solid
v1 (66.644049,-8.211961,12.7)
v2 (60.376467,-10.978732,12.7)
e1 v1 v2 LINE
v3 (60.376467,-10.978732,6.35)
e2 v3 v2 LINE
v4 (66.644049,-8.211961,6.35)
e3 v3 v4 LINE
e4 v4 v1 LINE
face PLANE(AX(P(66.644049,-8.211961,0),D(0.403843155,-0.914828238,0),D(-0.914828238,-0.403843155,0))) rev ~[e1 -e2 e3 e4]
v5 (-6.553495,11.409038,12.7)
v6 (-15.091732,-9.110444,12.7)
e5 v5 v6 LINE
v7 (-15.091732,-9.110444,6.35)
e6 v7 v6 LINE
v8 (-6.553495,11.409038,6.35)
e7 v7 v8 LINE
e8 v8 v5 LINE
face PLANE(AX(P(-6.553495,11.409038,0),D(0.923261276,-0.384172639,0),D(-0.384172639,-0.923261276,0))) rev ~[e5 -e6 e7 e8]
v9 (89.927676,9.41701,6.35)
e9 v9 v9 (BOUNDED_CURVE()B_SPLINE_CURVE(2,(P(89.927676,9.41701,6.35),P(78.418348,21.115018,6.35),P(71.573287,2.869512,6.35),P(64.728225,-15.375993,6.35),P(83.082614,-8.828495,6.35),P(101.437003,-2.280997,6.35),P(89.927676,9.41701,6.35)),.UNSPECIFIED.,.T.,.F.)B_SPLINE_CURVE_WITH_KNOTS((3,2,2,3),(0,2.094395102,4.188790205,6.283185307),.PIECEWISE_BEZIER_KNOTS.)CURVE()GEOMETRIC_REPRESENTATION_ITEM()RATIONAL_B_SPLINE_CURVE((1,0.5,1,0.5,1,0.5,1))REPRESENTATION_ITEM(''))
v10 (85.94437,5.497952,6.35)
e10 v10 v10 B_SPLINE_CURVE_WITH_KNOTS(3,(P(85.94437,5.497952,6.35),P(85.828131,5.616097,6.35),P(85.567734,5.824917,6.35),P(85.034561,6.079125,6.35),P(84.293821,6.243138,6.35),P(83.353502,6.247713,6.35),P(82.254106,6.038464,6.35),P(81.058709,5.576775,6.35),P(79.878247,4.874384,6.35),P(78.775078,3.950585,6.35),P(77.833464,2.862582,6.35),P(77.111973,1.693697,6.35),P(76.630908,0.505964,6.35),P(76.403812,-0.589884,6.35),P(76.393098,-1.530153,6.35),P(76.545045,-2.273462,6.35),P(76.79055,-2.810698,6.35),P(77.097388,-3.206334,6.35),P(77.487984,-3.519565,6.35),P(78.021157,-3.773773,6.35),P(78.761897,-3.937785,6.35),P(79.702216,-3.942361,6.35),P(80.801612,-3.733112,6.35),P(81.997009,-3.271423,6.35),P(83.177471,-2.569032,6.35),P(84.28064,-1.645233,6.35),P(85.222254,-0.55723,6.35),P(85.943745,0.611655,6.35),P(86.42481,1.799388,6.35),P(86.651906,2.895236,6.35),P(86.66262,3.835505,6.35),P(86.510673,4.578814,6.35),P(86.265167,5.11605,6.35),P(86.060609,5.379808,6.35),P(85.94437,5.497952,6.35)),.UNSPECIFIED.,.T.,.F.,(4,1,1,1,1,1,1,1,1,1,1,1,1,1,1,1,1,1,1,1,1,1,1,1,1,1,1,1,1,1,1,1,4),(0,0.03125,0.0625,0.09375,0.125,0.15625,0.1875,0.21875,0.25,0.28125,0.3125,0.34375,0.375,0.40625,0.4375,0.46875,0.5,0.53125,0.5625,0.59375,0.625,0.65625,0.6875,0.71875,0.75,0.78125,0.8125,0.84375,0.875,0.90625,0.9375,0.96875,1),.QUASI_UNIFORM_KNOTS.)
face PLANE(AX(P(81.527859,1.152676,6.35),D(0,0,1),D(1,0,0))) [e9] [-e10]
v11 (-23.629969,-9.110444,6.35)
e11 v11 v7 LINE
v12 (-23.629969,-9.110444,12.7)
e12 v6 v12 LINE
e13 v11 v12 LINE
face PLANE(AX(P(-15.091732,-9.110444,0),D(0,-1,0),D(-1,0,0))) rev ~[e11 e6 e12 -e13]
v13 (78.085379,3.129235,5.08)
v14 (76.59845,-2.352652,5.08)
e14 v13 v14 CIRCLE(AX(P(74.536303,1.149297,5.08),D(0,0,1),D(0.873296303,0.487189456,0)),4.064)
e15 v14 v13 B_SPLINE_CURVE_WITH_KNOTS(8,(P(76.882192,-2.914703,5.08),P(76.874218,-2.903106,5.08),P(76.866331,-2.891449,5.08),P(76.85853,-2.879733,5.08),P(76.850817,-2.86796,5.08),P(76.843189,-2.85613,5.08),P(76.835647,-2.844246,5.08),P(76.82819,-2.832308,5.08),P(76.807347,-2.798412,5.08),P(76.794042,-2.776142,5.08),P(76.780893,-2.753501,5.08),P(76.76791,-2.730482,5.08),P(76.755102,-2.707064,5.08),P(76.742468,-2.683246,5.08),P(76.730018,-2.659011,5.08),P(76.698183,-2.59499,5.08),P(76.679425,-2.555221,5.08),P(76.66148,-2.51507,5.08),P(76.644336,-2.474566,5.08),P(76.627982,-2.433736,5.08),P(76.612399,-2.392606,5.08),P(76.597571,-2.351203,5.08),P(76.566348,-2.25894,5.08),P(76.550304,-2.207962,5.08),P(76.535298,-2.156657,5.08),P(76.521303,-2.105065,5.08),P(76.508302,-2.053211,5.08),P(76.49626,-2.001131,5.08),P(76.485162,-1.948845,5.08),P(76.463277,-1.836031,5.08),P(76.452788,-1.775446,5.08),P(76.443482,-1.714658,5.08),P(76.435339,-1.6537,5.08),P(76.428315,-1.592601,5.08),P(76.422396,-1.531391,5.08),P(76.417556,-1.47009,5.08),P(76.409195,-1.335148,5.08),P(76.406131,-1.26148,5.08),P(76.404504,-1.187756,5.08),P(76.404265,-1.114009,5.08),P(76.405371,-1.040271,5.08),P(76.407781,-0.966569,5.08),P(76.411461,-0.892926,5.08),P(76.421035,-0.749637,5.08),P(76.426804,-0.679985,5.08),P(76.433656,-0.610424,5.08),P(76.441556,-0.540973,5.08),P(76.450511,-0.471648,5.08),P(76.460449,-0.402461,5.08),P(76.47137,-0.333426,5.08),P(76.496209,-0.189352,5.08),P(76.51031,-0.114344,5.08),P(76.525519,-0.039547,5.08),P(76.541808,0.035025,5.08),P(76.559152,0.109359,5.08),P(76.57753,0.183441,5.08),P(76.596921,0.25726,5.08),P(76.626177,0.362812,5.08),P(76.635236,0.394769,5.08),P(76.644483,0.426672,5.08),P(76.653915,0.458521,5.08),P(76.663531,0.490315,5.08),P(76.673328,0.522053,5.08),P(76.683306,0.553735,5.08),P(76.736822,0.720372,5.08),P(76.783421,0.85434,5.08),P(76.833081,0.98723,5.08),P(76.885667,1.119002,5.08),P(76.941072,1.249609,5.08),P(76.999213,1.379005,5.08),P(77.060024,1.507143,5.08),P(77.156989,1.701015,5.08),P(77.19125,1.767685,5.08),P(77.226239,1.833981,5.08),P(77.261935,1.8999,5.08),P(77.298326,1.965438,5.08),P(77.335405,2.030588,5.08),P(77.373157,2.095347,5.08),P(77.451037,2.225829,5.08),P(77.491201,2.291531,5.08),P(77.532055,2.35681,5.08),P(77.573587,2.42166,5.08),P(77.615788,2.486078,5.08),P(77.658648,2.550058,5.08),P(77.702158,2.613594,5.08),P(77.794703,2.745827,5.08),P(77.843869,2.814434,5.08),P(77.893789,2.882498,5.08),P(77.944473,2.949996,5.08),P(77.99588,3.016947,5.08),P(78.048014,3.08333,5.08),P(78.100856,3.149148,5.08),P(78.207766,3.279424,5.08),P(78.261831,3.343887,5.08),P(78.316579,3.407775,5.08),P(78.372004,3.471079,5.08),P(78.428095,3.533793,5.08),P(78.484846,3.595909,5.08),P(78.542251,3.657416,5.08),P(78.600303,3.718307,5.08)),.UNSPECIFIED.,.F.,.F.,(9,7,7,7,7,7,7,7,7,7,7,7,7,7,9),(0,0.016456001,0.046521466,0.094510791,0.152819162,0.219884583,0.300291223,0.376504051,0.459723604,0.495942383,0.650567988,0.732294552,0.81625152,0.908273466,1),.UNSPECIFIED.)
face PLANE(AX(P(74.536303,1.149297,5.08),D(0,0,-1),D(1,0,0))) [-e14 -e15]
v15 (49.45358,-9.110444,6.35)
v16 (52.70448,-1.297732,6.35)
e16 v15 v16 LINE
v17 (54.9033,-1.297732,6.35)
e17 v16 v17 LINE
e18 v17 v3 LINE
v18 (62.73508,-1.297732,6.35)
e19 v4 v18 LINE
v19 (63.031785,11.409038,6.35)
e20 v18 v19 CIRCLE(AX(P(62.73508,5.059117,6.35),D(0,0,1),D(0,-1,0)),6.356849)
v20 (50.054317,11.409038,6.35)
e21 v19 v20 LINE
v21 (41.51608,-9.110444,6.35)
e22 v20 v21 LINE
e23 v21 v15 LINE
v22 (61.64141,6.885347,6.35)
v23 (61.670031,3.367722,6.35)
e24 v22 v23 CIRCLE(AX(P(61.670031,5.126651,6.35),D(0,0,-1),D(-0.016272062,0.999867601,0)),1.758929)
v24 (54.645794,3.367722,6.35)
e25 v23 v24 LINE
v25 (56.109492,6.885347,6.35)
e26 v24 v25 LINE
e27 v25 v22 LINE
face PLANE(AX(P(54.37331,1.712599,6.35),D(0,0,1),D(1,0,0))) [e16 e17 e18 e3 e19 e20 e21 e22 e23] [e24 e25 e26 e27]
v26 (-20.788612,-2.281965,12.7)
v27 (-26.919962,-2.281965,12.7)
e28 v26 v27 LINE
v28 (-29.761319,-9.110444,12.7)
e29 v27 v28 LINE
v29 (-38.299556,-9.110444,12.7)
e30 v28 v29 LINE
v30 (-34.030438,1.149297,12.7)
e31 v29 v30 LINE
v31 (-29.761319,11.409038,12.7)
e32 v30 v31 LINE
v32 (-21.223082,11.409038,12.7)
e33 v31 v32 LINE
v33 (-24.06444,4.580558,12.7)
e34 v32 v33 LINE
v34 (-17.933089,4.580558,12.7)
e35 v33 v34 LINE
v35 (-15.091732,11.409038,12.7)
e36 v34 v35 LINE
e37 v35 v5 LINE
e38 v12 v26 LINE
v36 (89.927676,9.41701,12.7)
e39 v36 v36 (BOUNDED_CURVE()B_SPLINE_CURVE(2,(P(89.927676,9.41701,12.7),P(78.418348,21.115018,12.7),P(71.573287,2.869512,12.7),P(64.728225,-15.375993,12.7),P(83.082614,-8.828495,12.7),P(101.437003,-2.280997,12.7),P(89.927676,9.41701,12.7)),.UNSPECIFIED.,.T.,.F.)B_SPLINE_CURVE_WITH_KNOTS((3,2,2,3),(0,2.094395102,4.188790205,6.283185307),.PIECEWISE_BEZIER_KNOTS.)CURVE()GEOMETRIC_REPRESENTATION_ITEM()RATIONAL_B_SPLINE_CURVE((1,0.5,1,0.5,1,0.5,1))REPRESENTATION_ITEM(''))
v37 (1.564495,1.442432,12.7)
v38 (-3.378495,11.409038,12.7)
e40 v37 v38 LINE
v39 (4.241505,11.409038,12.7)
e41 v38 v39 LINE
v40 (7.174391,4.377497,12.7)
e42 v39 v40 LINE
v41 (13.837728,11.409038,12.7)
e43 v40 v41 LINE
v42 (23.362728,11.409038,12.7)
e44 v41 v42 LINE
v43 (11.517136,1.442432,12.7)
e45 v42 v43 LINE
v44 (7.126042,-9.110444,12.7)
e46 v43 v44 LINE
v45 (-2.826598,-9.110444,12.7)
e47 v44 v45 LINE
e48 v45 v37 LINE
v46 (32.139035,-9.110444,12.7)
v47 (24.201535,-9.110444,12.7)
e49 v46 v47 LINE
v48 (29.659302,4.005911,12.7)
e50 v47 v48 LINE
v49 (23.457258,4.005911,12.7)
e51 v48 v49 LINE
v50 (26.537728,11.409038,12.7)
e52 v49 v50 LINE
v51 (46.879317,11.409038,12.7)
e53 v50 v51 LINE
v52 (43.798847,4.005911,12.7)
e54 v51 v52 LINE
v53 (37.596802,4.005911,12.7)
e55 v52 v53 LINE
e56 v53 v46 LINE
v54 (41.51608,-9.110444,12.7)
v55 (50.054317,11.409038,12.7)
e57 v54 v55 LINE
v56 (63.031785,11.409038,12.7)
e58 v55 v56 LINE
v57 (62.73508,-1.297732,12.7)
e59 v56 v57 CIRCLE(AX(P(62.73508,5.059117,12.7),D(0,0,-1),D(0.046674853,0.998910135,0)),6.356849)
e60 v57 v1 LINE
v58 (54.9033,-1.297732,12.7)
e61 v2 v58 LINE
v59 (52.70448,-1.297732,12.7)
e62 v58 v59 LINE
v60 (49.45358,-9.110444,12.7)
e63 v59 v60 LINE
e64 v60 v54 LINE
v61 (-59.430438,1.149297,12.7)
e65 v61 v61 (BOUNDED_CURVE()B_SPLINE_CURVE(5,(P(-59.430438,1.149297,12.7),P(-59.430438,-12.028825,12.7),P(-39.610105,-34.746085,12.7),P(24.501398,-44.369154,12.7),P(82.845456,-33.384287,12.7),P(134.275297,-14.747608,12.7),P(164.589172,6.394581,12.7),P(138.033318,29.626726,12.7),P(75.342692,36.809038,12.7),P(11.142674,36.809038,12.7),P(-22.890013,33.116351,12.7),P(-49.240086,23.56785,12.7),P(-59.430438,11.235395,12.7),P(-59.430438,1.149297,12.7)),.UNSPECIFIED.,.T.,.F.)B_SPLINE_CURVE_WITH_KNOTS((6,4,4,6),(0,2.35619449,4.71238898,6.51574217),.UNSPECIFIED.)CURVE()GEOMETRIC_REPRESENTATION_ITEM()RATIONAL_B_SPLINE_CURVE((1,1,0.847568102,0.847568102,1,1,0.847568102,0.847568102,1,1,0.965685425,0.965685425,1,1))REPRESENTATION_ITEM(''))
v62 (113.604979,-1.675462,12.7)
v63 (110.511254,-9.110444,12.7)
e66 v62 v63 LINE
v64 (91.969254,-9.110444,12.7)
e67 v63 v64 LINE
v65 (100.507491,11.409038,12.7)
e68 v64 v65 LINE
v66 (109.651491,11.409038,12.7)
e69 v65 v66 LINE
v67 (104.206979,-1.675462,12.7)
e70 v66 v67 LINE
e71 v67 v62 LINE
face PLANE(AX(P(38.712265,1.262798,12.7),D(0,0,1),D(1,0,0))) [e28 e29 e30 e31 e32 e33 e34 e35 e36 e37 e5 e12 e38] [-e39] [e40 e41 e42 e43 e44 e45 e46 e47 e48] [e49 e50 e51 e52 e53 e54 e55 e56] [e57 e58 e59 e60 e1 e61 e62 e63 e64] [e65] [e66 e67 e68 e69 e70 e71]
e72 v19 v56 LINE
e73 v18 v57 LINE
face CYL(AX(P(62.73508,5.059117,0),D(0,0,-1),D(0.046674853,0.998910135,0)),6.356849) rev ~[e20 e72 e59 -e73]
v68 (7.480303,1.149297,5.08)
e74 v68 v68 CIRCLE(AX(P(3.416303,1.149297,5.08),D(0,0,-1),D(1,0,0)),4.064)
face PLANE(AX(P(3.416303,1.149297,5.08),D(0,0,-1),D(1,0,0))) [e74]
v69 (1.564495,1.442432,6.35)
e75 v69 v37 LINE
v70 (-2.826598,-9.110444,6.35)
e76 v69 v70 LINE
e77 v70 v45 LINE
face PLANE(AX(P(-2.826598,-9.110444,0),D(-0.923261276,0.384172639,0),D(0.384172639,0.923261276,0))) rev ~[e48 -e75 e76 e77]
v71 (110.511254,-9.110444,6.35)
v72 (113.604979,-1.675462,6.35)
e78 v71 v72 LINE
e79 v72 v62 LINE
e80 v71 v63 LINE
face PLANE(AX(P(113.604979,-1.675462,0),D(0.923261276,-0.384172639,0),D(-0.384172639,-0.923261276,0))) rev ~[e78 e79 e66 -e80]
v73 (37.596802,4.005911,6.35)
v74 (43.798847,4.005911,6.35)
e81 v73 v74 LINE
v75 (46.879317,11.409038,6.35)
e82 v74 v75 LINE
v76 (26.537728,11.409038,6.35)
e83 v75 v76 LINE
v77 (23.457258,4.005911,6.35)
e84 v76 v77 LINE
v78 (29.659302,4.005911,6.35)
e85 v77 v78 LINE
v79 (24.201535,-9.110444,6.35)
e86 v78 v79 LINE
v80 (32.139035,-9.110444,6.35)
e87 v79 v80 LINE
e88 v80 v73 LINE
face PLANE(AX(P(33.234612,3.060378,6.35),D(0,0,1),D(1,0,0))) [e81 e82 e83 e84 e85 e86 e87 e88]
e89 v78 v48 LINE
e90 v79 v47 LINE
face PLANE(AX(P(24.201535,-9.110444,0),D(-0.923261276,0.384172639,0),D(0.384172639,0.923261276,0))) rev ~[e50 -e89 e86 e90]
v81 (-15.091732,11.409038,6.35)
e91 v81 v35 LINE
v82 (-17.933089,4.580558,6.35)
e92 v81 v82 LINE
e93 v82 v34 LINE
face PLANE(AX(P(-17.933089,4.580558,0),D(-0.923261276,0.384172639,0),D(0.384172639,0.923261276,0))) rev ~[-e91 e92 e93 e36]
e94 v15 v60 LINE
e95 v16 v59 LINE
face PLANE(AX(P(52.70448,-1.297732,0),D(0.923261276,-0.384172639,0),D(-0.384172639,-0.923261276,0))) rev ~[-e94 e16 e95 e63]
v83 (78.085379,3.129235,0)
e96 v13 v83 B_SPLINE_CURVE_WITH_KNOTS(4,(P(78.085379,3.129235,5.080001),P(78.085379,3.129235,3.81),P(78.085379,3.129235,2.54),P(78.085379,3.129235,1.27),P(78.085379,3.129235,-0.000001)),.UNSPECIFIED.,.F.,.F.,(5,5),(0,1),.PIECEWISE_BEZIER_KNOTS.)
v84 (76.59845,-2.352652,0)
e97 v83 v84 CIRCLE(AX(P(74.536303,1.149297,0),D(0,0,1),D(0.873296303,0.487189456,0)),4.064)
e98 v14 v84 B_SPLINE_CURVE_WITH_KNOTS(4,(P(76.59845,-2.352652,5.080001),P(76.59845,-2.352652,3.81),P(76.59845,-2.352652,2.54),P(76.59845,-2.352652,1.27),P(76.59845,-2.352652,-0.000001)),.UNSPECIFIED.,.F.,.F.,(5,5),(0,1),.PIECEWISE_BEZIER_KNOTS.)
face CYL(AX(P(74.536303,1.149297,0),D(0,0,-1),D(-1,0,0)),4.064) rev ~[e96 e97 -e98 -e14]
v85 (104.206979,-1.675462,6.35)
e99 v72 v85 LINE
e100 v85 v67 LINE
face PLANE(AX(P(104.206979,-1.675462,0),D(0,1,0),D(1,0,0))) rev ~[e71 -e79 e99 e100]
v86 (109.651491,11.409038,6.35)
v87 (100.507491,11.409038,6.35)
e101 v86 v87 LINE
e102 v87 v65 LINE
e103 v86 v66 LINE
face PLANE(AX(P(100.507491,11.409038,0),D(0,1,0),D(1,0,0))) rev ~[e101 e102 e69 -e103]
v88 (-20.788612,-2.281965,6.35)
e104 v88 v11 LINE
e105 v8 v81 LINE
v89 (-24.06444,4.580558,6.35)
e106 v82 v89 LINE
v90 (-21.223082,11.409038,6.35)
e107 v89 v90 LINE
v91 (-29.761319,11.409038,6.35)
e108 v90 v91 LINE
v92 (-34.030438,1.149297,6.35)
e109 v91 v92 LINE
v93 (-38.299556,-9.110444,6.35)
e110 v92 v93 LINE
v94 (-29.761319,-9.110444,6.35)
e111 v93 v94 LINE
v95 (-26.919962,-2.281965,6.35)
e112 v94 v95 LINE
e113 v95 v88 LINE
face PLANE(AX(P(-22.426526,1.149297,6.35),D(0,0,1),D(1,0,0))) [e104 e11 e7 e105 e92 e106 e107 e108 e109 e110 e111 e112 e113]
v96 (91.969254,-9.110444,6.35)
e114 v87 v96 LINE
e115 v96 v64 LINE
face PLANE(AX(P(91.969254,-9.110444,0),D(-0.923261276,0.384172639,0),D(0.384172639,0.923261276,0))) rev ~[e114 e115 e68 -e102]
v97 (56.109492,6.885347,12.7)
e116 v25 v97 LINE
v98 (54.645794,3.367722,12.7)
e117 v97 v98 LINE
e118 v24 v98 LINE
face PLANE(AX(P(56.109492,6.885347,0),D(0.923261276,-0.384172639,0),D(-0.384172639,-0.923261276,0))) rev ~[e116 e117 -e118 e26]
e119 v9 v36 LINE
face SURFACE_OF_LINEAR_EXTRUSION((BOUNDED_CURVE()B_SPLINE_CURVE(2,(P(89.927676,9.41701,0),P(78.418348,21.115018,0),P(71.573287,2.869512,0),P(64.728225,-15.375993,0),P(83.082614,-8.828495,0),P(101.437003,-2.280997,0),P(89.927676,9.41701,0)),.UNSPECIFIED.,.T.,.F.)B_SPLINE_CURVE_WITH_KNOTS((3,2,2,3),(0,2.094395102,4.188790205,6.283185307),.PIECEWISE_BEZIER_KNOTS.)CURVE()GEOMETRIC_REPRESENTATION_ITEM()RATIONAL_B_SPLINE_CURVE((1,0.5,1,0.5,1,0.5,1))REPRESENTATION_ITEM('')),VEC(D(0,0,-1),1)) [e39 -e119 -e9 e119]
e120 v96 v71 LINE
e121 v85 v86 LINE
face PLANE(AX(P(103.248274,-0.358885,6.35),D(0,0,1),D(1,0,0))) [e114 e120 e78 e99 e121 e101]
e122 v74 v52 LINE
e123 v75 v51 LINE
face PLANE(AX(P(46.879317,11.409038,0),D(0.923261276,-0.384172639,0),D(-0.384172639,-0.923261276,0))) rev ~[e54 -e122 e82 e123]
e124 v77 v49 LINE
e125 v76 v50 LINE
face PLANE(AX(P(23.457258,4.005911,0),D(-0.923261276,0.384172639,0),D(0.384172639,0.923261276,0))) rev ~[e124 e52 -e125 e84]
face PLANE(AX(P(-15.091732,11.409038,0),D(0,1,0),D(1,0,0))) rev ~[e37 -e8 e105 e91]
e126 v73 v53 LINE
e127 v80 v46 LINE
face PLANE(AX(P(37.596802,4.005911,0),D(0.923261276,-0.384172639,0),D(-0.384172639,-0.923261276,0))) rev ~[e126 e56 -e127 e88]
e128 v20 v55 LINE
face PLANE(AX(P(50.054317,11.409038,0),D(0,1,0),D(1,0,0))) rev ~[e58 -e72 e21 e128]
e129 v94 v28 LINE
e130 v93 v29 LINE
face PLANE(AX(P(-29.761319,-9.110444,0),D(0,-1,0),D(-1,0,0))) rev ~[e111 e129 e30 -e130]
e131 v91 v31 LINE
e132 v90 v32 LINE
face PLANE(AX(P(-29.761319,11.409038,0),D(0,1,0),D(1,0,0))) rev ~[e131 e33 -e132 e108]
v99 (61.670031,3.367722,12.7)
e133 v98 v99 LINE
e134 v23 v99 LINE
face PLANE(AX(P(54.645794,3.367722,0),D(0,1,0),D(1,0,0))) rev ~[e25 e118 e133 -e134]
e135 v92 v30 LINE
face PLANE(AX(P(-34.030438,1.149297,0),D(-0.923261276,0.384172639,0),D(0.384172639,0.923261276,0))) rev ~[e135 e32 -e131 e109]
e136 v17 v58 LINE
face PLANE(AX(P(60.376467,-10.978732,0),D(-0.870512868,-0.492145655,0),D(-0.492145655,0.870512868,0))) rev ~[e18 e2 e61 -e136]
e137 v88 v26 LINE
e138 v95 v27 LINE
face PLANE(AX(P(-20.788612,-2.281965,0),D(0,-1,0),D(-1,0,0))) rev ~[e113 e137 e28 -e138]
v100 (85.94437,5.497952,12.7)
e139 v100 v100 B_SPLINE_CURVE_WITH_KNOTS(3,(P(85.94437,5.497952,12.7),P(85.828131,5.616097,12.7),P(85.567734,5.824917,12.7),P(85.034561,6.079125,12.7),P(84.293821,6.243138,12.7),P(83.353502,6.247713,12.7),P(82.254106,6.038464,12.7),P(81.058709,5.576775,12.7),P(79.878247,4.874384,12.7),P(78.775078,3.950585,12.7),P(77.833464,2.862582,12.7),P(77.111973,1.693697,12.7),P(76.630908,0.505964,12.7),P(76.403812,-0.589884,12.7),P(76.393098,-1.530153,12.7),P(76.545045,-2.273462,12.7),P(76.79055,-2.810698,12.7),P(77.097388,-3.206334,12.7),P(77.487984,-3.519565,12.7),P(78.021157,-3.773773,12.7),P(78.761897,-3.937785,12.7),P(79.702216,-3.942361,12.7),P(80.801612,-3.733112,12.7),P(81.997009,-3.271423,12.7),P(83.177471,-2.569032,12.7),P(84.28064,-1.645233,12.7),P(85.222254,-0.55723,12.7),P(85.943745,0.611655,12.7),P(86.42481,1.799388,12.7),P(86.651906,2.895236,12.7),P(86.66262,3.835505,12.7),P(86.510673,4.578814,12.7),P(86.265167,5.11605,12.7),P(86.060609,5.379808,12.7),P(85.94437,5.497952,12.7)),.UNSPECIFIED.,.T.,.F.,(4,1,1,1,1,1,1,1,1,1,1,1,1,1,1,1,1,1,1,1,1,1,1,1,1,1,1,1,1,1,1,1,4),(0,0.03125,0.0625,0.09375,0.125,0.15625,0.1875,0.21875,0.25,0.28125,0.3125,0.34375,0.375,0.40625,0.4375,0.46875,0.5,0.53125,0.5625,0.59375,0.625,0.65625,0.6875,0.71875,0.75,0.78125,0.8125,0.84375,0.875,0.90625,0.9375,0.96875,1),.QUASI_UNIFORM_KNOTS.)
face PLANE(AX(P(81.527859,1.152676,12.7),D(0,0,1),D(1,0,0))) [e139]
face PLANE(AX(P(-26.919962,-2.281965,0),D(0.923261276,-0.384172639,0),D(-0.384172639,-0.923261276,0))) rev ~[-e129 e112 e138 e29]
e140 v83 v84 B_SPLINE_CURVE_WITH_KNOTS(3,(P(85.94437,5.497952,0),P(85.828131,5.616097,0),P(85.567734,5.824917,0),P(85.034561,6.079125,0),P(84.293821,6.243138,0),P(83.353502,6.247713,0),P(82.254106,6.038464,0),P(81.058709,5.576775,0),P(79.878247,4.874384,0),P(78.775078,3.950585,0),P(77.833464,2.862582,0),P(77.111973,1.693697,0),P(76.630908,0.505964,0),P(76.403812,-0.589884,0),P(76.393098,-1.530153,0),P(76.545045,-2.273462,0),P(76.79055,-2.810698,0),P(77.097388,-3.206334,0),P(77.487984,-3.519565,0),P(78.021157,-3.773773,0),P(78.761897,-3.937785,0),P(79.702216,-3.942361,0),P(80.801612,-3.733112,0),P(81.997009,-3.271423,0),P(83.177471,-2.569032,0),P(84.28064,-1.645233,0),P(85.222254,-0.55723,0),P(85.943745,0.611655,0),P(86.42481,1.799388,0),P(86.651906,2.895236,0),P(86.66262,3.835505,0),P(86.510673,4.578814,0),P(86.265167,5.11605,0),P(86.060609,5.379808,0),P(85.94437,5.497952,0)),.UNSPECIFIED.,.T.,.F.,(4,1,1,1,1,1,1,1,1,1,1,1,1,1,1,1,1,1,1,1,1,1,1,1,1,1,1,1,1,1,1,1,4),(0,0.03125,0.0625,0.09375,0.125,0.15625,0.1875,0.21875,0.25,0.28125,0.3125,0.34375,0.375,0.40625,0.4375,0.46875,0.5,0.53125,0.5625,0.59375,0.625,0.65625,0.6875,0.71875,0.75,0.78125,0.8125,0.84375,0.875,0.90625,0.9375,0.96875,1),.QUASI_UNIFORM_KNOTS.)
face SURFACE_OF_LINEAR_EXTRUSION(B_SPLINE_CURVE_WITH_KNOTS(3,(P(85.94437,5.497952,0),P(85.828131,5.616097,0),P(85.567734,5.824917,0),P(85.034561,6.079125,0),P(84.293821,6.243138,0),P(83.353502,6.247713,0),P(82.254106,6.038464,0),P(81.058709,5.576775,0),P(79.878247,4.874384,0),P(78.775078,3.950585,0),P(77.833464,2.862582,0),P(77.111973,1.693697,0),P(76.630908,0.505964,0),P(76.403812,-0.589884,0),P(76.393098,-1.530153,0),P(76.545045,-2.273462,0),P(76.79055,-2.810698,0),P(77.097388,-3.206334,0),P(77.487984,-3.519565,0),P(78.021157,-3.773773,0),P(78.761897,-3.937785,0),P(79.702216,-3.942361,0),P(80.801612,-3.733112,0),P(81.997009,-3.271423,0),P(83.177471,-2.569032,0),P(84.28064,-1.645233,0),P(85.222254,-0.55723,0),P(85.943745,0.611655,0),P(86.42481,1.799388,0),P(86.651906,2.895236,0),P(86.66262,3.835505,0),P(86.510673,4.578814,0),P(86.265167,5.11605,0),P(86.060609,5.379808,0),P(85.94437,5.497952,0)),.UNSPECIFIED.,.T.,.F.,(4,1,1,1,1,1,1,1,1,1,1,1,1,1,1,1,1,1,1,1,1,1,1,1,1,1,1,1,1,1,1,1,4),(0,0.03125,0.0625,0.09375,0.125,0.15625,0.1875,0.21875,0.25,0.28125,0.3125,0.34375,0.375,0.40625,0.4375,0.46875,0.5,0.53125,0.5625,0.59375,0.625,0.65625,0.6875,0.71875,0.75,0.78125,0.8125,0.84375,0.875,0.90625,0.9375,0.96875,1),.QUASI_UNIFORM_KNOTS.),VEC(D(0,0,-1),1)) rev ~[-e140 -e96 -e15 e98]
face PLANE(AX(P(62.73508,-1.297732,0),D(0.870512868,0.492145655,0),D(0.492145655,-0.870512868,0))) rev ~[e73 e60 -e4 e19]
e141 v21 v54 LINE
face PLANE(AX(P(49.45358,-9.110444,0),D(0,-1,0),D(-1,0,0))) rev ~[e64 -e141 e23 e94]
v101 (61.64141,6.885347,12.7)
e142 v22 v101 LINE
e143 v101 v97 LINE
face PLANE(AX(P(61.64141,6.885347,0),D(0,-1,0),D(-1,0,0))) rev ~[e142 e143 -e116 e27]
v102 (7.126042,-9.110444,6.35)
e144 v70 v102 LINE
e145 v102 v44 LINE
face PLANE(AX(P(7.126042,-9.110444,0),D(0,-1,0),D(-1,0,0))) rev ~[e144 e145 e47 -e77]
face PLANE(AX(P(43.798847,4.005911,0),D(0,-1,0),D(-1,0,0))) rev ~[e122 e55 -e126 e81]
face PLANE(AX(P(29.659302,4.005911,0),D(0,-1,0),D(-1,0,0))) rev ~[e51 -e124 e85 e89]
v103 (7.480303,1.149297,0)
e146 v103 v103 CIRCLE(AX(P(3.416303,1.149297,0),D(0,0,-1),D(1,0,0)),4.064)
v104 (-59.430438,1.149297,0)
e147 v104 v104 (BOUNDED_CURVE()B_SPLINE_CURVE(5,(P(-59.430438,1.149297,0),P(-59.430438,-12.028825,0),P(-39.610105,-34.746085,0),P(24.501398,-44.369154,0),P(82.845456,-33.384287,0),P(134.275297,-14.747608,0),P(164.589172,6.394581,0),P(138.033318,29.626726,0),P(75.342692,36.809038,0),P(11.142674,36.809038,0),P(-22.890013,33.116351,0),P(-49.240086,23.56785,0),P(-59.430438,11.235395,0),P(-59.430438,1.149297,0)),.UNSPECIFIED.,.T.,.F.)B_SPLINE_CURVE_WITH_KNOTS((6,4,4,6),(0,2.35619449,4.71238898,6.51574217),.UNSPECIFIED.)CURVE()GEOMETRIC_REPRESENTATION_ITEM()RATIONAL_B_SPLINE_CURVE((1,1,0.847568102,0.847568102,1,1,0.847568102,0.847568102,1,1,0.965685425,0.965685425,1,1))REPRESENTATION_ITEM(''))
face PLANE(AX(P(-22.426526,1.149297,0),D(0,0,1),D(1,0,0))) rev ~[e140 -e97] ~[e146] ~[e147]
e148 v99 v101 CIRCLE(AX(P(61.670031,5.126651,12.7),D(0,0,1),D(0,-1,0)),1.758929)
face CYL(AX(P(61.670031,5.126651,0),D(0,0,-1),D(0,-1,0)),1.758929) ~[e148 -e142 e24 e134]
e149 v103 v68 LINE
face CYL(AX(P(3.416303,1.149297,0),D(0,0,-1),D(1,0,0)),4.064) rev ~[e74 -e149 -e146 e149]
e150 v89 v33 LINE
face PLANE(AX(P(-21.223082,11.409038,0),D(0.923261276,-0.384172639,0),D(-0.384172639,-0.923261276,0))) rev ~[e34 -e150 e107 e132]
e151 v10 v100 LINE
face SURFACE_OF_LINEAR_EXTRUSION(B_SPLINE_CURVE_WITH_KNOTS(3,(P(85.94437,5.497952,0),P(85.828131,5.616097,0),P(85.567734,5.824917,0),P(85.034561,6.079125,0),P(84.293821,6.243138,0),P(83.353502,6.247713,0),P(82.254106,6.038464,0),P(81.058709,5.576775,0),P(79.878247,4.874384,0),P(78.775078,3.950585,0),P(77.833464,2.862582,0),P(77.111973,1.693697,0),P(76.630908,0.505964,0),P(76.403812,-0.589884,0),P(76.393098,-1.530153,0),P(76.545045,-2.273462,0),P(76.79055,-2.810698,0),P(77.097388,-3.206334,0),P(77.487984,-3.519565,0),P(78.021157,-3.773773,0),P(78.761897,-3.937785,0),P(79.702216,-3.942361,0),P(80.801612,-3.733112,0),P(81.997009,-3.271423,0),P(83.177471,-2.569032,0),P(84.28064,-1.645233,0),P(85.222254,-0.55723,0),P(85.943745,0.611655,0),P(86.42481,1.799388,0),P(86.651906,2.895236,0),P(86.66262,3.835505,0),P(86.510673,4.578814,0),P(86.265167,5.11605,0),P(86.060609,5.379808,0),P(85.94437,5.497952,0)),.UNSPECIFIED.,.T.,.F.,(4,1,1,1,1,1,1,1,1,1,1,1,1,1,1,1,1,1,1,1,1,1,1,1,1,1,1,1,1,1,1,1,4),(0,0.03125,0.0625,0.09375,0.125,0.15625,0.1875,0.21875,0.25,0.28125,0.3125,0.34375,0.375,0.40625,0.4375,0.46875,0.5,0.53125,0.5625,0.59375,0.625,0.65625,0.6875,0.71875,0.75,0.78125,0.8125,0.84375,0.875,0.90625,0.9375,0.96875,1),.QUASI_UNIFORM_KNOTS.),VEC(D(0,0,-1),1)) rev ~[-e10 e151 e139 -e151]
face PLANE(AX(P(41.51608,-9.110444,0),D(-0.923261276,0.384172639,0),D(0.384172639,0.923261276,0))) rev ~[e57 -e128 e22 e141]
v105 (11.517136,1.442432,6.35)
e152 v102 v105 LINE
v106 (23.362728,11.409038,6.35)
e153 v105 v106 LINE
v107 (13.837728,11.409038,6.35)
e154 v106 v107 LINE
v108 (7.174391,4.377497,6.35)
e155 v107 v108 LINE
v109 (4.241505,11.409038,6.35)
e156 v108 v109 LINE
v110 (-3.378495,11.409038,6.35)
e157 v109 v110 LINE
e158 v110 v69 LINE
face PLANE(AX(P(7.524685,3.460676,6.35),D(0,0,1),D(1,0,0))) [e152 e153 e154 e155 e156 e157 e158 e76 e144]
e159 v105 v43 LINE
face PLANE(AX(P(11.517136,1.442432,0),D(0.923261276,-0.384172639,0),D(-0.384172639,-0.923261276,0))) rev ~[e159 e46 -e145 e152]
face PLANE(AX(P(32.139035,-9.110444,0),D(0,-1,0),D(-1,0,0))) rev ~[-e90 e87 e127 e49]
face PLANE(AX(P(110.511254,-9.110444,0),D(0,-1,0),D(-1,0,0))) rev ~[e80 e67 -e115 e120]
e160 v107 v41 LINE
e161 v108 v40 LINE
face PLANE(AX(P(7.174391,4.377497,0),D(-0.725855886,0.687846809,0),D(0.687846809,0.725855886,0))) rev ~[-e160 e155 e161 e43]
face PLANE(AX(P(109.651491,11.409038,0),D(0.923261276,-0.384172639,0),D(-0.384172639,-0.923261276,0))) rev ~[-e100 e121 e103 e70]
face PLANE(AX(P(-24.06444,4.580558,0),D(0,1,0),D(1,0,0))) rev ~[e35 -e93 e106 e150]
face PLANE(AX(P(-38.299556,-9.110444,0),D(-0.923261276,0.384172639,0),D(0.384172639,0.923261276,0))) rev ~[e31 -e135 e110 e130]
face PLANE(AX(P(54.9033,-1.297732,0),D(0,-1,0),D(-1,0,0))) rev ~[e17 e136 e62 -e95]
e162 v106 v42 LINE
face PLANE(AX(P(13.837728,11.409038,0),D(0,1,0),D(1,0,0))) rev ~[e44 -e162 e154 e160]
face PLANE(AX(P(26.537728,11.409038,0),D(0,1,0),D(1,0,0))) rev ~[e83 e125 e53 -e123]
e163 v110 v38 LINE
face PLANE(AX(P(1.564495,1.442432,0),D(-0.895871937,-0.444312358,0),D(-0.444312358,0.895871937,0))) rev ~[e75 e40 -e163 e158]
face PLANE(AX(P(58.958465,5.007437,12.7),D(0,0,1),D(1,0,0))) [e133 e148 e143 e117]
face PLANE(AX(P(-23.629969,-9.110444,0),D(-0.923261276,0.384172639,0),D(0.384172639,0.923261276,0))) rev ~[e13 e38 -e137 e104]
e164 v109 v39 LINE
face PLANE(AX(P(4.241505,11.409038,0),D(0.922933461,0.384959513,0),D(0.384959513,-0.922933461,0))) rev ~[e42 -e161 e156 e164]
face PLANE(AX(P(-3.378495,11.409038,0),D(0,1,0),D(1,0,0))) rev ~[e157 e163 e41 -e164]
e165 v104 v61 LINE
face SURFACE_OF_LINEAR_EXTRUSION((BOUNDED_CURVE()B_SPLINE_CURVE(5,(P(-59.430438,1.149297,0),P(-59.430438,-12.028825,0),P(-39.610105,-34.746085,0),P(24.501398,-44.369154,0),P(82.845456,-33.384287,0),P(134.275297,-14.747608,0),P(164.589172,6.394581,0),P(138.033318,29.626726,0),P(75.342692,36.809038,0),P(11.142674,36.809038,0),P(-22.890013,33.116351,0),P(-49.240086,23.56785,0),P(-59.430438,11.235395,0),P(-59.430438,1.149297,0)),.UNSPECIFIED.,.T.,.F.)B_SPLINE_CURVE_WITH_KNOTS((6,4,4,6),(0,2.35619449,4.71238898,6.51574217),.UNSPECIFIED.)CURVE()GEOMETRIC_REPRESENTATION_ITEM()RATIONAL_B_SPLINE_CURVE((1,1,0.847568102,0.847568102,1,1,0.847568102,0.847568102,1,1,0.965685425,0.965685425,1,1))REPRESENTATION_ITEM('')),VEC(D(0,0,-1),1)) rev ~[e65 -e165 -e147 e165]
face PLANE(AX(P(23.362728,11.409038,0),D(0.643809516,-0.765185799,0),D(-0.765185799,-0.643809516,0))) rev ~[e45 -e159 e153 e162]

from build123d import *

# Parameters (mm, degrees)
F1_DEPTH = 12.7
F2_DEPTH = 6.35
F3_R     = 4.064
F4_DEPTH = 5.08
F5_DEPTH = 12.7


# Not quite as in the source:
# - the dataset's text gives a spline's control points without its knots; the knots are read off the source's solid
# - a feature names something its author has since deleted; it is built from what else it names


with BuildPart() as f1:
    # F0 (on Top) → F1 (new body)
    with BuildSketch(Plane.XY):
        with BuildLine():
            add(Edge.make_bspline(
                [(38.9763030052, 36.8090377465), (-59.430437785, 36.8090377465), (-59.430437785, 1.1492968171)],
                knots=[4.7123889804, 4.7123889804, 4.7123889804, 6.2831853072, 6.2831853072, 6.2831853072], degree=2, weights=[1, 0.7071067812, 1]))
            add(Edge.make_bspline(
                [(-59.430437785, 1.1492968171), (-59.430437785, -84.9409333653), (108.5603767324, -24.0659478094), (276.5511912498, 36.8090377465), (38.9763030052, 36.8090377465)],
                knots=[0, 0, 0, 2.3561944902, 2.3561944902, 4.7123889804, 4.7123889804, 4.7123889804], degree=2, weights=[1, 0.3826834324, 1, 0.3826834324, 1]))
        make_face()
        with BuildLine():
            Line((41.5160800878, -9.1104441122), (50.0543169812, 11.4090377465))
            Line((50.0543169812, 11.4090377465), (63.0317851901, 11.4090377465))
            ThreePointArc((63.0317851901, 11.4090377465), (69.090196833, 4.9107240283), (62.7350802025, -1.2977319333))
            Line((62.7350802025, -1.2977319333), (66.6440492651, -8.2119611582))
            Line((66.6440492651, -8.2119611582), (60.376466607, -10.9787322865))
            Line((60.376466607, -10.9787322865), (54.9032996575, -1.2977319333))
            Line((54.9032996575, -1.2977319333), (52.7044802725, -1.2977319333))
            Line((52.7044802725, -1.2977319333), (49.4535800878, -9.1104441122))
            Line((49.4535800878, -9.1104441122), (41.5160800878, -9.1104441122))
        make_face(mode=Mode.SUBTRACT)
        Polygon((-29.7613193382, -9.1104441122), (-38.2995562317, -9.1104441122), (-34.030437785, 1.1492968171), (-29.7613193382, 11.4090377465), (-21.2230824447, 11.4090377465), (-24.0644395016, 4.5805583649), (-17.9330891249, 4.5805583649), (-15.0917320681, 11.4090377465), (-6.5534951746, 11.4090377465), (-15.0917320681, -9.1104441122), (-23.6299689616, -9.1104441122), (-20.7886119047, -2.2819647307), (-26.9199622814, -2.2819647307), align=None, mode=Mode.SUBTRACT)
        Polygon((7.1260423387, -9.1104441122), (-2.8265984822, -9.1104441122), (1.5644947773, 1.4424322722), (-3.3784951746, 11.4090377465), (4.2415048254, 11.4090377465), (7.1743905157, 4.3774974254), (13.8377277804, 11.4090377465), (23.3627277804, 11.4090377465), (11.5171355982, 1.4424322722), align=None, mode=Mode.SUBTRACT)
        Polygon((26.5377277804, 11.4090377465), (38.9763030052, 11.4090377465), (46.8793169812, 11.4090377465), (43.7988467258, 4.0059105773), (37.5968021254, 4.0059105773), (32.1390354874, -9.1104441122), (24.2015354874, -9.1104441122), (29.6593021254, 4.0059105773), (23.457257525, 4.0059105773), align=None, mode=Mode.SUBTRACT)
        with BuildLine():
            add(Edge.make_bspline(
                [(89.9276758544, 9.4170104569), (78.4183483926, 21.1150176431), (71.5732868008, 2.8695124614), (64.7282252089, -15.3759927203), (83.0826142625, -8.8284947248), (101.4370033161, -2.2809967293), (89.9276758544, 9.4170104569)],
                knots=[0, 0, 0, 2.0943951024, 2.0943951024, 4.1887902048, 4.1887902048, 6.2831853072, 6.2831853072, 6.2831853072], degree=2, weights=[1, 0.5, 1, 0.5, 1, 0.5, 1]))
        make_face(mode=Mode.SUBTRACT)
        Polygon((91.9692541833, -9.1104441122), (100.5074910767, 11.4090377465), (109.6514910767, 11.4090377465), (104.2069794715, -1.6754618412), (113.6049794715, -1.6754618412), (110.5112541833, -9.1104441122), align=None, mode=Mode.SUBTRACT)
    extrude(amount=F1_DEPTH)

    # F0 (on Top) → F2 (join)
    with BuildSketch(Plane.XY):
        Polygon((-34.030437785, 1.1492968171), (-38.2995562317, -9.1104441122), (-29.7613193382, -9.1104441122), (-26.9199622814, -2.2819647307), (-20.7886119047, -2.2819647307), (-23.6299689616, -9.1104441122), (-15.0917320681, -9.1104441122), (-6.5534951746, 11.4090377465), (-15.0917320681, 11.4090377465), (-17.9330891249, 4.5805583649), (-24.0644395016, 4.5805583649), (-21.2230824447, 11.4090377465), (-29.7613193382, 11.4090377465), align=None)
        Polygon((1.5644947773, 1.4424322722), (-2.8265984822, -9.1104441122), (7.1260423387, -9.1104441122), (11.5171355982, 1.4424322722), (23.3627277804, 11.4090377465), (13.8377277804, 11.4090377465), (7.1743905157, 4.3774974254), (4.2415048254, 11.4090377465), (-3.3784951746, 11.4090377465), align=None)
        Polygon((46.8793169812, 11.4090377465), (38.9763030052, 11.4090377465), (26.5377277804, 11.4090377465), (23.457257525, 4.0059105773), (29.6593021254, 4.0059105773), (24.2015354874, -9.1104441122), (32.1390354874, -9.1104441122), (37.5968021254, 4.0059105773), (43.7988467258, 4.0059105773), align=None)
        with BuildLine():
            Line((63.0317851901, 11.4090377465), (50.0543169812, 11.4090377465))
            Line((50.0543169812, 11.4090377465), (41.5160800878, -9.1104441122))
            Line((41.5160800878, -9.1104441122), (49.4535800878, -9.1104441122))
            Line((49.4535800878, -9.1104441122), (52.7044802725, -1.2977319333))
            Line((52.7044802725, -1.2977319333), (54.9032996575, -1.2977319333))
            Line((54.9032996575, -1.2977319333), (62.7350802025, -1.2977319333))
            ThreePointArc((62.7350802025, -1.2977319333), (69.090196833, 4.9107240283), (63.0317851901, 11.4090377465))
        make_face()
        with BuildLine():
            Line((54.6457937759, 3.3677215688), (56.1094915291, 6.8853470303))
            Line((56.1094915291, 6.8853470303), (61.6414099932, 6.8853470303))
            ThreePointArc((61.6414099932, 6.8853470303), (63.4289023483, 5.140961916), (61.6700313985, 3.3677215688))
            Line((61.6700313985, 3.3677215688), (54.6457937759, 3.3677215688))
        make_face(mode=Mode.SUBTRACT)
        Polygon((66.6440492651, -8.2119611582), (62.7350802025, -1.2977319333), (54.9032996575, -1.2977319333), (60.376466607, -10.9787322865), align=None)
        Polygon((109.6514910767, 11.4090377465), (100.5074910767, 11.4090377465), (91.9692541833, -9.1104441122), (110.5112541833, -9.1104441122), (113.6049794715, -1.6754618412), (104.2069794715, -1.6754618412), align=None)
        with BuildLine():
            add(Edge.make_bspline(
                [(89.9276758544, 9.4170104569), (78.4183483926, 21.1150176431), (71.5732868008, 2.8695124614), (64.7282252089, -15.3759927203), (83.0826142625, -8.8284947248), (101.4370033161, -2.2809967293), (89.9276758544, 9.4170104569)],
                knots=[0, 0, 0, 2.0943951024, 2.0943951024, 4.1887902048, 4.1887902048, 6.2831853072, 6.2831853072, 6.2831853072], degree=2, weights=[1, 0.5, 1, 0.5, 1, 0.5, 1]))
        make_face()
        with BuildLine():
            add(Edge.make_bspline(
                [(85.9443699375, 5.4979521551), (85.8281310105, 5.6160966608), (85.567733934, 5.8249167649), (85.0345610289, 6.0791249218), (84.2938208293, 6.2431375515), (83.3535018874, 6.2477134028), (82.2541063192, 6.0384641997), (81.0587088146, 5.576775297), (79.8782469474, 4.8743843262), (78.7750781655, 3.9505849579), (77.8334641871, 2.8625823157), (77.1119726081, 1.6936968647), (76.630908436, 0.505964109), (76.4038115156, -0.5898838883), (76.3930978548, -1.5301529287), (76.5450449027, -2.2734619362), (76.7905504491, -2.8106976019), (77.0973883963, -3.2063344797), (77.4879840111, -3.5195646359), (78.0211569162, -3.7737727927), (78.7618971158, -3.9377854224), (79.7022160577, -3.9423612737), (80.8016116259, -3.7331120707), (81.9970091305, -3.271423168), (83.1774709977, -2.5690321972), (84.2806397796, -1.6452328289), (85.222253758, -0.5572301866), (85.943745337, 0.6116552643), (86.4248095091, 1.7993880201), (86.6519064295, 2.8952360173), (86.6626200903, 3.8355050577), (86.5106730424, 4.5788140653), (86.265167496, 5.1160497309), (86.0606088645, 5.3798076495), (85.9443699375, 5.4979521551)],
                knots=[0, 0, 0, 0, 0.03125, 0.0625, 0.09375, 0.125, 0.15625, 0.1875, 0.21875, 0.25, 0.28125, 0.3125, 0.34375, 0.375, 0.40625, 0.4375, 0.46875, 0.5, 0.53125, 0.5625, 0.59375, 0.625, 0.65625, 0.6875, 0.71875, 0.75, 0.78125, 0.8125, 0.84375, 0.875, 0.90625, 0.9375, 0.96875, 1, 1, 1, 1], degree=3))
        make_face(mode=Mode.SUBTRACT)
    extrude(amount=F2_DEPTH)

    # F3 (on face) → F4 (cut)
    with BuildSketch(Plane(origin=(0, 0, 0), x_dir=(1, 0, 0), z_dir=(0, 0, -1))):
        with Locations((3.4163030052, -1.1492968171)):
            Circle(F3_R)
        with BuildLine():
            ThreePointArc((78.6003030052, -1.1492968171), (74.5363030052, 2.9147031829), (70.4723030052, -1.1492968171))
            ThreePointArc((70.4723030052, -1.1492968171), (74.5363030052, -5.2132968171), (78.6003030052, -1.1492968171))
        make_face()
    extrude(amount=-F4_DEPTH, mode=Mode.SUBTRACT)

    # F0 (on Top) → F5 (join)
    with BuildSketch(Plane.XY):
        with BuildLine():
            Line((61.6414099932, 6.8853470303), (56.1094915291, 6.8853470303))
            Line((56.1094915291, 6.8853470303), (54.6457937759, 3.3677215688))
            Line((54.6457937759, 3.3677215688), (61.6700313985, 3.3677215688))
            ThreePointArc((61.6700313985, 3.3677215688), (63.4289023483, 5.140961916), (61.6414099932, 6.8853470303))
        make_face()
        with BuildLine():
            add(Edge.make_bspline(
                [(85.9443699375, 5.4979521551), (85.8281310105, 5.6160966608), (85.567733934, 5.8249167649), (85.0345610289, 6.0791249218), (84.2938208293, 6.2431375515), (83.3535018874, 6.2477134028), (82.2541063192, 6.0384641997), (81.0587088146, 5.576775297), (79.8782469474, 4.8743843262), (78.7750781655, 3.9505849579), (77.8334641871, 2.8625823157), (77.1119726081, 1.6936968647), (76.630908436, 0.505964109), (76.4038115156, -0.5898838883), (76.3930978548, -1.5301529287), (76.5450449027, -2.2734619362), (76.7905504491, -2.8106976019), (77.0973883963, -3.2063344797), (77.4879840111, -3.5195646359), (78.0211569162, -3.7737727927), (78.7618971158, -3.9377854224), (79.7022160577, -3.9423612737), (80.8016116259, -3.7331120707), (81.9970091305, -3.271423168), (83.1774709977, -2.5690321972), (84.2806397796, -1.6452328289), (85.222253758, -0.5572301866), (85.943745337, 0.6116552643), (86.4248095091, 1.7993880201), (86.6519064295, 2.8952360173), (86.6626200903, 3.8355050577), (86.5106730424, 4.5788140653), (86.265167496, 5.1160497309), (86.0606088645, 5.3798076495), (85.9443699375, 5.4979521551)],
                knots=[0, 0, 0, 0, 0.03125, 0.0625, 0.09375, 0.125, 0.15625, 0.1875, 0.21875, 0.25, 0.28125, 0.3125, 0.34375, 0.375, 0.40625, 0.4375, 0.46875, 0.5, 0.53125, 0.5625, 0.59375, 0.625, 0.65625, 0.6875, 0.71875, 0.75, 0.78125, 0.8125, 0.84375, 0.875, 0.90625, 0.9375, 0.96875, 1, 1, 1, 1], degree=3))
        make_face()
    extrude(amount=F5_DEPTH)


solid = f1.part
